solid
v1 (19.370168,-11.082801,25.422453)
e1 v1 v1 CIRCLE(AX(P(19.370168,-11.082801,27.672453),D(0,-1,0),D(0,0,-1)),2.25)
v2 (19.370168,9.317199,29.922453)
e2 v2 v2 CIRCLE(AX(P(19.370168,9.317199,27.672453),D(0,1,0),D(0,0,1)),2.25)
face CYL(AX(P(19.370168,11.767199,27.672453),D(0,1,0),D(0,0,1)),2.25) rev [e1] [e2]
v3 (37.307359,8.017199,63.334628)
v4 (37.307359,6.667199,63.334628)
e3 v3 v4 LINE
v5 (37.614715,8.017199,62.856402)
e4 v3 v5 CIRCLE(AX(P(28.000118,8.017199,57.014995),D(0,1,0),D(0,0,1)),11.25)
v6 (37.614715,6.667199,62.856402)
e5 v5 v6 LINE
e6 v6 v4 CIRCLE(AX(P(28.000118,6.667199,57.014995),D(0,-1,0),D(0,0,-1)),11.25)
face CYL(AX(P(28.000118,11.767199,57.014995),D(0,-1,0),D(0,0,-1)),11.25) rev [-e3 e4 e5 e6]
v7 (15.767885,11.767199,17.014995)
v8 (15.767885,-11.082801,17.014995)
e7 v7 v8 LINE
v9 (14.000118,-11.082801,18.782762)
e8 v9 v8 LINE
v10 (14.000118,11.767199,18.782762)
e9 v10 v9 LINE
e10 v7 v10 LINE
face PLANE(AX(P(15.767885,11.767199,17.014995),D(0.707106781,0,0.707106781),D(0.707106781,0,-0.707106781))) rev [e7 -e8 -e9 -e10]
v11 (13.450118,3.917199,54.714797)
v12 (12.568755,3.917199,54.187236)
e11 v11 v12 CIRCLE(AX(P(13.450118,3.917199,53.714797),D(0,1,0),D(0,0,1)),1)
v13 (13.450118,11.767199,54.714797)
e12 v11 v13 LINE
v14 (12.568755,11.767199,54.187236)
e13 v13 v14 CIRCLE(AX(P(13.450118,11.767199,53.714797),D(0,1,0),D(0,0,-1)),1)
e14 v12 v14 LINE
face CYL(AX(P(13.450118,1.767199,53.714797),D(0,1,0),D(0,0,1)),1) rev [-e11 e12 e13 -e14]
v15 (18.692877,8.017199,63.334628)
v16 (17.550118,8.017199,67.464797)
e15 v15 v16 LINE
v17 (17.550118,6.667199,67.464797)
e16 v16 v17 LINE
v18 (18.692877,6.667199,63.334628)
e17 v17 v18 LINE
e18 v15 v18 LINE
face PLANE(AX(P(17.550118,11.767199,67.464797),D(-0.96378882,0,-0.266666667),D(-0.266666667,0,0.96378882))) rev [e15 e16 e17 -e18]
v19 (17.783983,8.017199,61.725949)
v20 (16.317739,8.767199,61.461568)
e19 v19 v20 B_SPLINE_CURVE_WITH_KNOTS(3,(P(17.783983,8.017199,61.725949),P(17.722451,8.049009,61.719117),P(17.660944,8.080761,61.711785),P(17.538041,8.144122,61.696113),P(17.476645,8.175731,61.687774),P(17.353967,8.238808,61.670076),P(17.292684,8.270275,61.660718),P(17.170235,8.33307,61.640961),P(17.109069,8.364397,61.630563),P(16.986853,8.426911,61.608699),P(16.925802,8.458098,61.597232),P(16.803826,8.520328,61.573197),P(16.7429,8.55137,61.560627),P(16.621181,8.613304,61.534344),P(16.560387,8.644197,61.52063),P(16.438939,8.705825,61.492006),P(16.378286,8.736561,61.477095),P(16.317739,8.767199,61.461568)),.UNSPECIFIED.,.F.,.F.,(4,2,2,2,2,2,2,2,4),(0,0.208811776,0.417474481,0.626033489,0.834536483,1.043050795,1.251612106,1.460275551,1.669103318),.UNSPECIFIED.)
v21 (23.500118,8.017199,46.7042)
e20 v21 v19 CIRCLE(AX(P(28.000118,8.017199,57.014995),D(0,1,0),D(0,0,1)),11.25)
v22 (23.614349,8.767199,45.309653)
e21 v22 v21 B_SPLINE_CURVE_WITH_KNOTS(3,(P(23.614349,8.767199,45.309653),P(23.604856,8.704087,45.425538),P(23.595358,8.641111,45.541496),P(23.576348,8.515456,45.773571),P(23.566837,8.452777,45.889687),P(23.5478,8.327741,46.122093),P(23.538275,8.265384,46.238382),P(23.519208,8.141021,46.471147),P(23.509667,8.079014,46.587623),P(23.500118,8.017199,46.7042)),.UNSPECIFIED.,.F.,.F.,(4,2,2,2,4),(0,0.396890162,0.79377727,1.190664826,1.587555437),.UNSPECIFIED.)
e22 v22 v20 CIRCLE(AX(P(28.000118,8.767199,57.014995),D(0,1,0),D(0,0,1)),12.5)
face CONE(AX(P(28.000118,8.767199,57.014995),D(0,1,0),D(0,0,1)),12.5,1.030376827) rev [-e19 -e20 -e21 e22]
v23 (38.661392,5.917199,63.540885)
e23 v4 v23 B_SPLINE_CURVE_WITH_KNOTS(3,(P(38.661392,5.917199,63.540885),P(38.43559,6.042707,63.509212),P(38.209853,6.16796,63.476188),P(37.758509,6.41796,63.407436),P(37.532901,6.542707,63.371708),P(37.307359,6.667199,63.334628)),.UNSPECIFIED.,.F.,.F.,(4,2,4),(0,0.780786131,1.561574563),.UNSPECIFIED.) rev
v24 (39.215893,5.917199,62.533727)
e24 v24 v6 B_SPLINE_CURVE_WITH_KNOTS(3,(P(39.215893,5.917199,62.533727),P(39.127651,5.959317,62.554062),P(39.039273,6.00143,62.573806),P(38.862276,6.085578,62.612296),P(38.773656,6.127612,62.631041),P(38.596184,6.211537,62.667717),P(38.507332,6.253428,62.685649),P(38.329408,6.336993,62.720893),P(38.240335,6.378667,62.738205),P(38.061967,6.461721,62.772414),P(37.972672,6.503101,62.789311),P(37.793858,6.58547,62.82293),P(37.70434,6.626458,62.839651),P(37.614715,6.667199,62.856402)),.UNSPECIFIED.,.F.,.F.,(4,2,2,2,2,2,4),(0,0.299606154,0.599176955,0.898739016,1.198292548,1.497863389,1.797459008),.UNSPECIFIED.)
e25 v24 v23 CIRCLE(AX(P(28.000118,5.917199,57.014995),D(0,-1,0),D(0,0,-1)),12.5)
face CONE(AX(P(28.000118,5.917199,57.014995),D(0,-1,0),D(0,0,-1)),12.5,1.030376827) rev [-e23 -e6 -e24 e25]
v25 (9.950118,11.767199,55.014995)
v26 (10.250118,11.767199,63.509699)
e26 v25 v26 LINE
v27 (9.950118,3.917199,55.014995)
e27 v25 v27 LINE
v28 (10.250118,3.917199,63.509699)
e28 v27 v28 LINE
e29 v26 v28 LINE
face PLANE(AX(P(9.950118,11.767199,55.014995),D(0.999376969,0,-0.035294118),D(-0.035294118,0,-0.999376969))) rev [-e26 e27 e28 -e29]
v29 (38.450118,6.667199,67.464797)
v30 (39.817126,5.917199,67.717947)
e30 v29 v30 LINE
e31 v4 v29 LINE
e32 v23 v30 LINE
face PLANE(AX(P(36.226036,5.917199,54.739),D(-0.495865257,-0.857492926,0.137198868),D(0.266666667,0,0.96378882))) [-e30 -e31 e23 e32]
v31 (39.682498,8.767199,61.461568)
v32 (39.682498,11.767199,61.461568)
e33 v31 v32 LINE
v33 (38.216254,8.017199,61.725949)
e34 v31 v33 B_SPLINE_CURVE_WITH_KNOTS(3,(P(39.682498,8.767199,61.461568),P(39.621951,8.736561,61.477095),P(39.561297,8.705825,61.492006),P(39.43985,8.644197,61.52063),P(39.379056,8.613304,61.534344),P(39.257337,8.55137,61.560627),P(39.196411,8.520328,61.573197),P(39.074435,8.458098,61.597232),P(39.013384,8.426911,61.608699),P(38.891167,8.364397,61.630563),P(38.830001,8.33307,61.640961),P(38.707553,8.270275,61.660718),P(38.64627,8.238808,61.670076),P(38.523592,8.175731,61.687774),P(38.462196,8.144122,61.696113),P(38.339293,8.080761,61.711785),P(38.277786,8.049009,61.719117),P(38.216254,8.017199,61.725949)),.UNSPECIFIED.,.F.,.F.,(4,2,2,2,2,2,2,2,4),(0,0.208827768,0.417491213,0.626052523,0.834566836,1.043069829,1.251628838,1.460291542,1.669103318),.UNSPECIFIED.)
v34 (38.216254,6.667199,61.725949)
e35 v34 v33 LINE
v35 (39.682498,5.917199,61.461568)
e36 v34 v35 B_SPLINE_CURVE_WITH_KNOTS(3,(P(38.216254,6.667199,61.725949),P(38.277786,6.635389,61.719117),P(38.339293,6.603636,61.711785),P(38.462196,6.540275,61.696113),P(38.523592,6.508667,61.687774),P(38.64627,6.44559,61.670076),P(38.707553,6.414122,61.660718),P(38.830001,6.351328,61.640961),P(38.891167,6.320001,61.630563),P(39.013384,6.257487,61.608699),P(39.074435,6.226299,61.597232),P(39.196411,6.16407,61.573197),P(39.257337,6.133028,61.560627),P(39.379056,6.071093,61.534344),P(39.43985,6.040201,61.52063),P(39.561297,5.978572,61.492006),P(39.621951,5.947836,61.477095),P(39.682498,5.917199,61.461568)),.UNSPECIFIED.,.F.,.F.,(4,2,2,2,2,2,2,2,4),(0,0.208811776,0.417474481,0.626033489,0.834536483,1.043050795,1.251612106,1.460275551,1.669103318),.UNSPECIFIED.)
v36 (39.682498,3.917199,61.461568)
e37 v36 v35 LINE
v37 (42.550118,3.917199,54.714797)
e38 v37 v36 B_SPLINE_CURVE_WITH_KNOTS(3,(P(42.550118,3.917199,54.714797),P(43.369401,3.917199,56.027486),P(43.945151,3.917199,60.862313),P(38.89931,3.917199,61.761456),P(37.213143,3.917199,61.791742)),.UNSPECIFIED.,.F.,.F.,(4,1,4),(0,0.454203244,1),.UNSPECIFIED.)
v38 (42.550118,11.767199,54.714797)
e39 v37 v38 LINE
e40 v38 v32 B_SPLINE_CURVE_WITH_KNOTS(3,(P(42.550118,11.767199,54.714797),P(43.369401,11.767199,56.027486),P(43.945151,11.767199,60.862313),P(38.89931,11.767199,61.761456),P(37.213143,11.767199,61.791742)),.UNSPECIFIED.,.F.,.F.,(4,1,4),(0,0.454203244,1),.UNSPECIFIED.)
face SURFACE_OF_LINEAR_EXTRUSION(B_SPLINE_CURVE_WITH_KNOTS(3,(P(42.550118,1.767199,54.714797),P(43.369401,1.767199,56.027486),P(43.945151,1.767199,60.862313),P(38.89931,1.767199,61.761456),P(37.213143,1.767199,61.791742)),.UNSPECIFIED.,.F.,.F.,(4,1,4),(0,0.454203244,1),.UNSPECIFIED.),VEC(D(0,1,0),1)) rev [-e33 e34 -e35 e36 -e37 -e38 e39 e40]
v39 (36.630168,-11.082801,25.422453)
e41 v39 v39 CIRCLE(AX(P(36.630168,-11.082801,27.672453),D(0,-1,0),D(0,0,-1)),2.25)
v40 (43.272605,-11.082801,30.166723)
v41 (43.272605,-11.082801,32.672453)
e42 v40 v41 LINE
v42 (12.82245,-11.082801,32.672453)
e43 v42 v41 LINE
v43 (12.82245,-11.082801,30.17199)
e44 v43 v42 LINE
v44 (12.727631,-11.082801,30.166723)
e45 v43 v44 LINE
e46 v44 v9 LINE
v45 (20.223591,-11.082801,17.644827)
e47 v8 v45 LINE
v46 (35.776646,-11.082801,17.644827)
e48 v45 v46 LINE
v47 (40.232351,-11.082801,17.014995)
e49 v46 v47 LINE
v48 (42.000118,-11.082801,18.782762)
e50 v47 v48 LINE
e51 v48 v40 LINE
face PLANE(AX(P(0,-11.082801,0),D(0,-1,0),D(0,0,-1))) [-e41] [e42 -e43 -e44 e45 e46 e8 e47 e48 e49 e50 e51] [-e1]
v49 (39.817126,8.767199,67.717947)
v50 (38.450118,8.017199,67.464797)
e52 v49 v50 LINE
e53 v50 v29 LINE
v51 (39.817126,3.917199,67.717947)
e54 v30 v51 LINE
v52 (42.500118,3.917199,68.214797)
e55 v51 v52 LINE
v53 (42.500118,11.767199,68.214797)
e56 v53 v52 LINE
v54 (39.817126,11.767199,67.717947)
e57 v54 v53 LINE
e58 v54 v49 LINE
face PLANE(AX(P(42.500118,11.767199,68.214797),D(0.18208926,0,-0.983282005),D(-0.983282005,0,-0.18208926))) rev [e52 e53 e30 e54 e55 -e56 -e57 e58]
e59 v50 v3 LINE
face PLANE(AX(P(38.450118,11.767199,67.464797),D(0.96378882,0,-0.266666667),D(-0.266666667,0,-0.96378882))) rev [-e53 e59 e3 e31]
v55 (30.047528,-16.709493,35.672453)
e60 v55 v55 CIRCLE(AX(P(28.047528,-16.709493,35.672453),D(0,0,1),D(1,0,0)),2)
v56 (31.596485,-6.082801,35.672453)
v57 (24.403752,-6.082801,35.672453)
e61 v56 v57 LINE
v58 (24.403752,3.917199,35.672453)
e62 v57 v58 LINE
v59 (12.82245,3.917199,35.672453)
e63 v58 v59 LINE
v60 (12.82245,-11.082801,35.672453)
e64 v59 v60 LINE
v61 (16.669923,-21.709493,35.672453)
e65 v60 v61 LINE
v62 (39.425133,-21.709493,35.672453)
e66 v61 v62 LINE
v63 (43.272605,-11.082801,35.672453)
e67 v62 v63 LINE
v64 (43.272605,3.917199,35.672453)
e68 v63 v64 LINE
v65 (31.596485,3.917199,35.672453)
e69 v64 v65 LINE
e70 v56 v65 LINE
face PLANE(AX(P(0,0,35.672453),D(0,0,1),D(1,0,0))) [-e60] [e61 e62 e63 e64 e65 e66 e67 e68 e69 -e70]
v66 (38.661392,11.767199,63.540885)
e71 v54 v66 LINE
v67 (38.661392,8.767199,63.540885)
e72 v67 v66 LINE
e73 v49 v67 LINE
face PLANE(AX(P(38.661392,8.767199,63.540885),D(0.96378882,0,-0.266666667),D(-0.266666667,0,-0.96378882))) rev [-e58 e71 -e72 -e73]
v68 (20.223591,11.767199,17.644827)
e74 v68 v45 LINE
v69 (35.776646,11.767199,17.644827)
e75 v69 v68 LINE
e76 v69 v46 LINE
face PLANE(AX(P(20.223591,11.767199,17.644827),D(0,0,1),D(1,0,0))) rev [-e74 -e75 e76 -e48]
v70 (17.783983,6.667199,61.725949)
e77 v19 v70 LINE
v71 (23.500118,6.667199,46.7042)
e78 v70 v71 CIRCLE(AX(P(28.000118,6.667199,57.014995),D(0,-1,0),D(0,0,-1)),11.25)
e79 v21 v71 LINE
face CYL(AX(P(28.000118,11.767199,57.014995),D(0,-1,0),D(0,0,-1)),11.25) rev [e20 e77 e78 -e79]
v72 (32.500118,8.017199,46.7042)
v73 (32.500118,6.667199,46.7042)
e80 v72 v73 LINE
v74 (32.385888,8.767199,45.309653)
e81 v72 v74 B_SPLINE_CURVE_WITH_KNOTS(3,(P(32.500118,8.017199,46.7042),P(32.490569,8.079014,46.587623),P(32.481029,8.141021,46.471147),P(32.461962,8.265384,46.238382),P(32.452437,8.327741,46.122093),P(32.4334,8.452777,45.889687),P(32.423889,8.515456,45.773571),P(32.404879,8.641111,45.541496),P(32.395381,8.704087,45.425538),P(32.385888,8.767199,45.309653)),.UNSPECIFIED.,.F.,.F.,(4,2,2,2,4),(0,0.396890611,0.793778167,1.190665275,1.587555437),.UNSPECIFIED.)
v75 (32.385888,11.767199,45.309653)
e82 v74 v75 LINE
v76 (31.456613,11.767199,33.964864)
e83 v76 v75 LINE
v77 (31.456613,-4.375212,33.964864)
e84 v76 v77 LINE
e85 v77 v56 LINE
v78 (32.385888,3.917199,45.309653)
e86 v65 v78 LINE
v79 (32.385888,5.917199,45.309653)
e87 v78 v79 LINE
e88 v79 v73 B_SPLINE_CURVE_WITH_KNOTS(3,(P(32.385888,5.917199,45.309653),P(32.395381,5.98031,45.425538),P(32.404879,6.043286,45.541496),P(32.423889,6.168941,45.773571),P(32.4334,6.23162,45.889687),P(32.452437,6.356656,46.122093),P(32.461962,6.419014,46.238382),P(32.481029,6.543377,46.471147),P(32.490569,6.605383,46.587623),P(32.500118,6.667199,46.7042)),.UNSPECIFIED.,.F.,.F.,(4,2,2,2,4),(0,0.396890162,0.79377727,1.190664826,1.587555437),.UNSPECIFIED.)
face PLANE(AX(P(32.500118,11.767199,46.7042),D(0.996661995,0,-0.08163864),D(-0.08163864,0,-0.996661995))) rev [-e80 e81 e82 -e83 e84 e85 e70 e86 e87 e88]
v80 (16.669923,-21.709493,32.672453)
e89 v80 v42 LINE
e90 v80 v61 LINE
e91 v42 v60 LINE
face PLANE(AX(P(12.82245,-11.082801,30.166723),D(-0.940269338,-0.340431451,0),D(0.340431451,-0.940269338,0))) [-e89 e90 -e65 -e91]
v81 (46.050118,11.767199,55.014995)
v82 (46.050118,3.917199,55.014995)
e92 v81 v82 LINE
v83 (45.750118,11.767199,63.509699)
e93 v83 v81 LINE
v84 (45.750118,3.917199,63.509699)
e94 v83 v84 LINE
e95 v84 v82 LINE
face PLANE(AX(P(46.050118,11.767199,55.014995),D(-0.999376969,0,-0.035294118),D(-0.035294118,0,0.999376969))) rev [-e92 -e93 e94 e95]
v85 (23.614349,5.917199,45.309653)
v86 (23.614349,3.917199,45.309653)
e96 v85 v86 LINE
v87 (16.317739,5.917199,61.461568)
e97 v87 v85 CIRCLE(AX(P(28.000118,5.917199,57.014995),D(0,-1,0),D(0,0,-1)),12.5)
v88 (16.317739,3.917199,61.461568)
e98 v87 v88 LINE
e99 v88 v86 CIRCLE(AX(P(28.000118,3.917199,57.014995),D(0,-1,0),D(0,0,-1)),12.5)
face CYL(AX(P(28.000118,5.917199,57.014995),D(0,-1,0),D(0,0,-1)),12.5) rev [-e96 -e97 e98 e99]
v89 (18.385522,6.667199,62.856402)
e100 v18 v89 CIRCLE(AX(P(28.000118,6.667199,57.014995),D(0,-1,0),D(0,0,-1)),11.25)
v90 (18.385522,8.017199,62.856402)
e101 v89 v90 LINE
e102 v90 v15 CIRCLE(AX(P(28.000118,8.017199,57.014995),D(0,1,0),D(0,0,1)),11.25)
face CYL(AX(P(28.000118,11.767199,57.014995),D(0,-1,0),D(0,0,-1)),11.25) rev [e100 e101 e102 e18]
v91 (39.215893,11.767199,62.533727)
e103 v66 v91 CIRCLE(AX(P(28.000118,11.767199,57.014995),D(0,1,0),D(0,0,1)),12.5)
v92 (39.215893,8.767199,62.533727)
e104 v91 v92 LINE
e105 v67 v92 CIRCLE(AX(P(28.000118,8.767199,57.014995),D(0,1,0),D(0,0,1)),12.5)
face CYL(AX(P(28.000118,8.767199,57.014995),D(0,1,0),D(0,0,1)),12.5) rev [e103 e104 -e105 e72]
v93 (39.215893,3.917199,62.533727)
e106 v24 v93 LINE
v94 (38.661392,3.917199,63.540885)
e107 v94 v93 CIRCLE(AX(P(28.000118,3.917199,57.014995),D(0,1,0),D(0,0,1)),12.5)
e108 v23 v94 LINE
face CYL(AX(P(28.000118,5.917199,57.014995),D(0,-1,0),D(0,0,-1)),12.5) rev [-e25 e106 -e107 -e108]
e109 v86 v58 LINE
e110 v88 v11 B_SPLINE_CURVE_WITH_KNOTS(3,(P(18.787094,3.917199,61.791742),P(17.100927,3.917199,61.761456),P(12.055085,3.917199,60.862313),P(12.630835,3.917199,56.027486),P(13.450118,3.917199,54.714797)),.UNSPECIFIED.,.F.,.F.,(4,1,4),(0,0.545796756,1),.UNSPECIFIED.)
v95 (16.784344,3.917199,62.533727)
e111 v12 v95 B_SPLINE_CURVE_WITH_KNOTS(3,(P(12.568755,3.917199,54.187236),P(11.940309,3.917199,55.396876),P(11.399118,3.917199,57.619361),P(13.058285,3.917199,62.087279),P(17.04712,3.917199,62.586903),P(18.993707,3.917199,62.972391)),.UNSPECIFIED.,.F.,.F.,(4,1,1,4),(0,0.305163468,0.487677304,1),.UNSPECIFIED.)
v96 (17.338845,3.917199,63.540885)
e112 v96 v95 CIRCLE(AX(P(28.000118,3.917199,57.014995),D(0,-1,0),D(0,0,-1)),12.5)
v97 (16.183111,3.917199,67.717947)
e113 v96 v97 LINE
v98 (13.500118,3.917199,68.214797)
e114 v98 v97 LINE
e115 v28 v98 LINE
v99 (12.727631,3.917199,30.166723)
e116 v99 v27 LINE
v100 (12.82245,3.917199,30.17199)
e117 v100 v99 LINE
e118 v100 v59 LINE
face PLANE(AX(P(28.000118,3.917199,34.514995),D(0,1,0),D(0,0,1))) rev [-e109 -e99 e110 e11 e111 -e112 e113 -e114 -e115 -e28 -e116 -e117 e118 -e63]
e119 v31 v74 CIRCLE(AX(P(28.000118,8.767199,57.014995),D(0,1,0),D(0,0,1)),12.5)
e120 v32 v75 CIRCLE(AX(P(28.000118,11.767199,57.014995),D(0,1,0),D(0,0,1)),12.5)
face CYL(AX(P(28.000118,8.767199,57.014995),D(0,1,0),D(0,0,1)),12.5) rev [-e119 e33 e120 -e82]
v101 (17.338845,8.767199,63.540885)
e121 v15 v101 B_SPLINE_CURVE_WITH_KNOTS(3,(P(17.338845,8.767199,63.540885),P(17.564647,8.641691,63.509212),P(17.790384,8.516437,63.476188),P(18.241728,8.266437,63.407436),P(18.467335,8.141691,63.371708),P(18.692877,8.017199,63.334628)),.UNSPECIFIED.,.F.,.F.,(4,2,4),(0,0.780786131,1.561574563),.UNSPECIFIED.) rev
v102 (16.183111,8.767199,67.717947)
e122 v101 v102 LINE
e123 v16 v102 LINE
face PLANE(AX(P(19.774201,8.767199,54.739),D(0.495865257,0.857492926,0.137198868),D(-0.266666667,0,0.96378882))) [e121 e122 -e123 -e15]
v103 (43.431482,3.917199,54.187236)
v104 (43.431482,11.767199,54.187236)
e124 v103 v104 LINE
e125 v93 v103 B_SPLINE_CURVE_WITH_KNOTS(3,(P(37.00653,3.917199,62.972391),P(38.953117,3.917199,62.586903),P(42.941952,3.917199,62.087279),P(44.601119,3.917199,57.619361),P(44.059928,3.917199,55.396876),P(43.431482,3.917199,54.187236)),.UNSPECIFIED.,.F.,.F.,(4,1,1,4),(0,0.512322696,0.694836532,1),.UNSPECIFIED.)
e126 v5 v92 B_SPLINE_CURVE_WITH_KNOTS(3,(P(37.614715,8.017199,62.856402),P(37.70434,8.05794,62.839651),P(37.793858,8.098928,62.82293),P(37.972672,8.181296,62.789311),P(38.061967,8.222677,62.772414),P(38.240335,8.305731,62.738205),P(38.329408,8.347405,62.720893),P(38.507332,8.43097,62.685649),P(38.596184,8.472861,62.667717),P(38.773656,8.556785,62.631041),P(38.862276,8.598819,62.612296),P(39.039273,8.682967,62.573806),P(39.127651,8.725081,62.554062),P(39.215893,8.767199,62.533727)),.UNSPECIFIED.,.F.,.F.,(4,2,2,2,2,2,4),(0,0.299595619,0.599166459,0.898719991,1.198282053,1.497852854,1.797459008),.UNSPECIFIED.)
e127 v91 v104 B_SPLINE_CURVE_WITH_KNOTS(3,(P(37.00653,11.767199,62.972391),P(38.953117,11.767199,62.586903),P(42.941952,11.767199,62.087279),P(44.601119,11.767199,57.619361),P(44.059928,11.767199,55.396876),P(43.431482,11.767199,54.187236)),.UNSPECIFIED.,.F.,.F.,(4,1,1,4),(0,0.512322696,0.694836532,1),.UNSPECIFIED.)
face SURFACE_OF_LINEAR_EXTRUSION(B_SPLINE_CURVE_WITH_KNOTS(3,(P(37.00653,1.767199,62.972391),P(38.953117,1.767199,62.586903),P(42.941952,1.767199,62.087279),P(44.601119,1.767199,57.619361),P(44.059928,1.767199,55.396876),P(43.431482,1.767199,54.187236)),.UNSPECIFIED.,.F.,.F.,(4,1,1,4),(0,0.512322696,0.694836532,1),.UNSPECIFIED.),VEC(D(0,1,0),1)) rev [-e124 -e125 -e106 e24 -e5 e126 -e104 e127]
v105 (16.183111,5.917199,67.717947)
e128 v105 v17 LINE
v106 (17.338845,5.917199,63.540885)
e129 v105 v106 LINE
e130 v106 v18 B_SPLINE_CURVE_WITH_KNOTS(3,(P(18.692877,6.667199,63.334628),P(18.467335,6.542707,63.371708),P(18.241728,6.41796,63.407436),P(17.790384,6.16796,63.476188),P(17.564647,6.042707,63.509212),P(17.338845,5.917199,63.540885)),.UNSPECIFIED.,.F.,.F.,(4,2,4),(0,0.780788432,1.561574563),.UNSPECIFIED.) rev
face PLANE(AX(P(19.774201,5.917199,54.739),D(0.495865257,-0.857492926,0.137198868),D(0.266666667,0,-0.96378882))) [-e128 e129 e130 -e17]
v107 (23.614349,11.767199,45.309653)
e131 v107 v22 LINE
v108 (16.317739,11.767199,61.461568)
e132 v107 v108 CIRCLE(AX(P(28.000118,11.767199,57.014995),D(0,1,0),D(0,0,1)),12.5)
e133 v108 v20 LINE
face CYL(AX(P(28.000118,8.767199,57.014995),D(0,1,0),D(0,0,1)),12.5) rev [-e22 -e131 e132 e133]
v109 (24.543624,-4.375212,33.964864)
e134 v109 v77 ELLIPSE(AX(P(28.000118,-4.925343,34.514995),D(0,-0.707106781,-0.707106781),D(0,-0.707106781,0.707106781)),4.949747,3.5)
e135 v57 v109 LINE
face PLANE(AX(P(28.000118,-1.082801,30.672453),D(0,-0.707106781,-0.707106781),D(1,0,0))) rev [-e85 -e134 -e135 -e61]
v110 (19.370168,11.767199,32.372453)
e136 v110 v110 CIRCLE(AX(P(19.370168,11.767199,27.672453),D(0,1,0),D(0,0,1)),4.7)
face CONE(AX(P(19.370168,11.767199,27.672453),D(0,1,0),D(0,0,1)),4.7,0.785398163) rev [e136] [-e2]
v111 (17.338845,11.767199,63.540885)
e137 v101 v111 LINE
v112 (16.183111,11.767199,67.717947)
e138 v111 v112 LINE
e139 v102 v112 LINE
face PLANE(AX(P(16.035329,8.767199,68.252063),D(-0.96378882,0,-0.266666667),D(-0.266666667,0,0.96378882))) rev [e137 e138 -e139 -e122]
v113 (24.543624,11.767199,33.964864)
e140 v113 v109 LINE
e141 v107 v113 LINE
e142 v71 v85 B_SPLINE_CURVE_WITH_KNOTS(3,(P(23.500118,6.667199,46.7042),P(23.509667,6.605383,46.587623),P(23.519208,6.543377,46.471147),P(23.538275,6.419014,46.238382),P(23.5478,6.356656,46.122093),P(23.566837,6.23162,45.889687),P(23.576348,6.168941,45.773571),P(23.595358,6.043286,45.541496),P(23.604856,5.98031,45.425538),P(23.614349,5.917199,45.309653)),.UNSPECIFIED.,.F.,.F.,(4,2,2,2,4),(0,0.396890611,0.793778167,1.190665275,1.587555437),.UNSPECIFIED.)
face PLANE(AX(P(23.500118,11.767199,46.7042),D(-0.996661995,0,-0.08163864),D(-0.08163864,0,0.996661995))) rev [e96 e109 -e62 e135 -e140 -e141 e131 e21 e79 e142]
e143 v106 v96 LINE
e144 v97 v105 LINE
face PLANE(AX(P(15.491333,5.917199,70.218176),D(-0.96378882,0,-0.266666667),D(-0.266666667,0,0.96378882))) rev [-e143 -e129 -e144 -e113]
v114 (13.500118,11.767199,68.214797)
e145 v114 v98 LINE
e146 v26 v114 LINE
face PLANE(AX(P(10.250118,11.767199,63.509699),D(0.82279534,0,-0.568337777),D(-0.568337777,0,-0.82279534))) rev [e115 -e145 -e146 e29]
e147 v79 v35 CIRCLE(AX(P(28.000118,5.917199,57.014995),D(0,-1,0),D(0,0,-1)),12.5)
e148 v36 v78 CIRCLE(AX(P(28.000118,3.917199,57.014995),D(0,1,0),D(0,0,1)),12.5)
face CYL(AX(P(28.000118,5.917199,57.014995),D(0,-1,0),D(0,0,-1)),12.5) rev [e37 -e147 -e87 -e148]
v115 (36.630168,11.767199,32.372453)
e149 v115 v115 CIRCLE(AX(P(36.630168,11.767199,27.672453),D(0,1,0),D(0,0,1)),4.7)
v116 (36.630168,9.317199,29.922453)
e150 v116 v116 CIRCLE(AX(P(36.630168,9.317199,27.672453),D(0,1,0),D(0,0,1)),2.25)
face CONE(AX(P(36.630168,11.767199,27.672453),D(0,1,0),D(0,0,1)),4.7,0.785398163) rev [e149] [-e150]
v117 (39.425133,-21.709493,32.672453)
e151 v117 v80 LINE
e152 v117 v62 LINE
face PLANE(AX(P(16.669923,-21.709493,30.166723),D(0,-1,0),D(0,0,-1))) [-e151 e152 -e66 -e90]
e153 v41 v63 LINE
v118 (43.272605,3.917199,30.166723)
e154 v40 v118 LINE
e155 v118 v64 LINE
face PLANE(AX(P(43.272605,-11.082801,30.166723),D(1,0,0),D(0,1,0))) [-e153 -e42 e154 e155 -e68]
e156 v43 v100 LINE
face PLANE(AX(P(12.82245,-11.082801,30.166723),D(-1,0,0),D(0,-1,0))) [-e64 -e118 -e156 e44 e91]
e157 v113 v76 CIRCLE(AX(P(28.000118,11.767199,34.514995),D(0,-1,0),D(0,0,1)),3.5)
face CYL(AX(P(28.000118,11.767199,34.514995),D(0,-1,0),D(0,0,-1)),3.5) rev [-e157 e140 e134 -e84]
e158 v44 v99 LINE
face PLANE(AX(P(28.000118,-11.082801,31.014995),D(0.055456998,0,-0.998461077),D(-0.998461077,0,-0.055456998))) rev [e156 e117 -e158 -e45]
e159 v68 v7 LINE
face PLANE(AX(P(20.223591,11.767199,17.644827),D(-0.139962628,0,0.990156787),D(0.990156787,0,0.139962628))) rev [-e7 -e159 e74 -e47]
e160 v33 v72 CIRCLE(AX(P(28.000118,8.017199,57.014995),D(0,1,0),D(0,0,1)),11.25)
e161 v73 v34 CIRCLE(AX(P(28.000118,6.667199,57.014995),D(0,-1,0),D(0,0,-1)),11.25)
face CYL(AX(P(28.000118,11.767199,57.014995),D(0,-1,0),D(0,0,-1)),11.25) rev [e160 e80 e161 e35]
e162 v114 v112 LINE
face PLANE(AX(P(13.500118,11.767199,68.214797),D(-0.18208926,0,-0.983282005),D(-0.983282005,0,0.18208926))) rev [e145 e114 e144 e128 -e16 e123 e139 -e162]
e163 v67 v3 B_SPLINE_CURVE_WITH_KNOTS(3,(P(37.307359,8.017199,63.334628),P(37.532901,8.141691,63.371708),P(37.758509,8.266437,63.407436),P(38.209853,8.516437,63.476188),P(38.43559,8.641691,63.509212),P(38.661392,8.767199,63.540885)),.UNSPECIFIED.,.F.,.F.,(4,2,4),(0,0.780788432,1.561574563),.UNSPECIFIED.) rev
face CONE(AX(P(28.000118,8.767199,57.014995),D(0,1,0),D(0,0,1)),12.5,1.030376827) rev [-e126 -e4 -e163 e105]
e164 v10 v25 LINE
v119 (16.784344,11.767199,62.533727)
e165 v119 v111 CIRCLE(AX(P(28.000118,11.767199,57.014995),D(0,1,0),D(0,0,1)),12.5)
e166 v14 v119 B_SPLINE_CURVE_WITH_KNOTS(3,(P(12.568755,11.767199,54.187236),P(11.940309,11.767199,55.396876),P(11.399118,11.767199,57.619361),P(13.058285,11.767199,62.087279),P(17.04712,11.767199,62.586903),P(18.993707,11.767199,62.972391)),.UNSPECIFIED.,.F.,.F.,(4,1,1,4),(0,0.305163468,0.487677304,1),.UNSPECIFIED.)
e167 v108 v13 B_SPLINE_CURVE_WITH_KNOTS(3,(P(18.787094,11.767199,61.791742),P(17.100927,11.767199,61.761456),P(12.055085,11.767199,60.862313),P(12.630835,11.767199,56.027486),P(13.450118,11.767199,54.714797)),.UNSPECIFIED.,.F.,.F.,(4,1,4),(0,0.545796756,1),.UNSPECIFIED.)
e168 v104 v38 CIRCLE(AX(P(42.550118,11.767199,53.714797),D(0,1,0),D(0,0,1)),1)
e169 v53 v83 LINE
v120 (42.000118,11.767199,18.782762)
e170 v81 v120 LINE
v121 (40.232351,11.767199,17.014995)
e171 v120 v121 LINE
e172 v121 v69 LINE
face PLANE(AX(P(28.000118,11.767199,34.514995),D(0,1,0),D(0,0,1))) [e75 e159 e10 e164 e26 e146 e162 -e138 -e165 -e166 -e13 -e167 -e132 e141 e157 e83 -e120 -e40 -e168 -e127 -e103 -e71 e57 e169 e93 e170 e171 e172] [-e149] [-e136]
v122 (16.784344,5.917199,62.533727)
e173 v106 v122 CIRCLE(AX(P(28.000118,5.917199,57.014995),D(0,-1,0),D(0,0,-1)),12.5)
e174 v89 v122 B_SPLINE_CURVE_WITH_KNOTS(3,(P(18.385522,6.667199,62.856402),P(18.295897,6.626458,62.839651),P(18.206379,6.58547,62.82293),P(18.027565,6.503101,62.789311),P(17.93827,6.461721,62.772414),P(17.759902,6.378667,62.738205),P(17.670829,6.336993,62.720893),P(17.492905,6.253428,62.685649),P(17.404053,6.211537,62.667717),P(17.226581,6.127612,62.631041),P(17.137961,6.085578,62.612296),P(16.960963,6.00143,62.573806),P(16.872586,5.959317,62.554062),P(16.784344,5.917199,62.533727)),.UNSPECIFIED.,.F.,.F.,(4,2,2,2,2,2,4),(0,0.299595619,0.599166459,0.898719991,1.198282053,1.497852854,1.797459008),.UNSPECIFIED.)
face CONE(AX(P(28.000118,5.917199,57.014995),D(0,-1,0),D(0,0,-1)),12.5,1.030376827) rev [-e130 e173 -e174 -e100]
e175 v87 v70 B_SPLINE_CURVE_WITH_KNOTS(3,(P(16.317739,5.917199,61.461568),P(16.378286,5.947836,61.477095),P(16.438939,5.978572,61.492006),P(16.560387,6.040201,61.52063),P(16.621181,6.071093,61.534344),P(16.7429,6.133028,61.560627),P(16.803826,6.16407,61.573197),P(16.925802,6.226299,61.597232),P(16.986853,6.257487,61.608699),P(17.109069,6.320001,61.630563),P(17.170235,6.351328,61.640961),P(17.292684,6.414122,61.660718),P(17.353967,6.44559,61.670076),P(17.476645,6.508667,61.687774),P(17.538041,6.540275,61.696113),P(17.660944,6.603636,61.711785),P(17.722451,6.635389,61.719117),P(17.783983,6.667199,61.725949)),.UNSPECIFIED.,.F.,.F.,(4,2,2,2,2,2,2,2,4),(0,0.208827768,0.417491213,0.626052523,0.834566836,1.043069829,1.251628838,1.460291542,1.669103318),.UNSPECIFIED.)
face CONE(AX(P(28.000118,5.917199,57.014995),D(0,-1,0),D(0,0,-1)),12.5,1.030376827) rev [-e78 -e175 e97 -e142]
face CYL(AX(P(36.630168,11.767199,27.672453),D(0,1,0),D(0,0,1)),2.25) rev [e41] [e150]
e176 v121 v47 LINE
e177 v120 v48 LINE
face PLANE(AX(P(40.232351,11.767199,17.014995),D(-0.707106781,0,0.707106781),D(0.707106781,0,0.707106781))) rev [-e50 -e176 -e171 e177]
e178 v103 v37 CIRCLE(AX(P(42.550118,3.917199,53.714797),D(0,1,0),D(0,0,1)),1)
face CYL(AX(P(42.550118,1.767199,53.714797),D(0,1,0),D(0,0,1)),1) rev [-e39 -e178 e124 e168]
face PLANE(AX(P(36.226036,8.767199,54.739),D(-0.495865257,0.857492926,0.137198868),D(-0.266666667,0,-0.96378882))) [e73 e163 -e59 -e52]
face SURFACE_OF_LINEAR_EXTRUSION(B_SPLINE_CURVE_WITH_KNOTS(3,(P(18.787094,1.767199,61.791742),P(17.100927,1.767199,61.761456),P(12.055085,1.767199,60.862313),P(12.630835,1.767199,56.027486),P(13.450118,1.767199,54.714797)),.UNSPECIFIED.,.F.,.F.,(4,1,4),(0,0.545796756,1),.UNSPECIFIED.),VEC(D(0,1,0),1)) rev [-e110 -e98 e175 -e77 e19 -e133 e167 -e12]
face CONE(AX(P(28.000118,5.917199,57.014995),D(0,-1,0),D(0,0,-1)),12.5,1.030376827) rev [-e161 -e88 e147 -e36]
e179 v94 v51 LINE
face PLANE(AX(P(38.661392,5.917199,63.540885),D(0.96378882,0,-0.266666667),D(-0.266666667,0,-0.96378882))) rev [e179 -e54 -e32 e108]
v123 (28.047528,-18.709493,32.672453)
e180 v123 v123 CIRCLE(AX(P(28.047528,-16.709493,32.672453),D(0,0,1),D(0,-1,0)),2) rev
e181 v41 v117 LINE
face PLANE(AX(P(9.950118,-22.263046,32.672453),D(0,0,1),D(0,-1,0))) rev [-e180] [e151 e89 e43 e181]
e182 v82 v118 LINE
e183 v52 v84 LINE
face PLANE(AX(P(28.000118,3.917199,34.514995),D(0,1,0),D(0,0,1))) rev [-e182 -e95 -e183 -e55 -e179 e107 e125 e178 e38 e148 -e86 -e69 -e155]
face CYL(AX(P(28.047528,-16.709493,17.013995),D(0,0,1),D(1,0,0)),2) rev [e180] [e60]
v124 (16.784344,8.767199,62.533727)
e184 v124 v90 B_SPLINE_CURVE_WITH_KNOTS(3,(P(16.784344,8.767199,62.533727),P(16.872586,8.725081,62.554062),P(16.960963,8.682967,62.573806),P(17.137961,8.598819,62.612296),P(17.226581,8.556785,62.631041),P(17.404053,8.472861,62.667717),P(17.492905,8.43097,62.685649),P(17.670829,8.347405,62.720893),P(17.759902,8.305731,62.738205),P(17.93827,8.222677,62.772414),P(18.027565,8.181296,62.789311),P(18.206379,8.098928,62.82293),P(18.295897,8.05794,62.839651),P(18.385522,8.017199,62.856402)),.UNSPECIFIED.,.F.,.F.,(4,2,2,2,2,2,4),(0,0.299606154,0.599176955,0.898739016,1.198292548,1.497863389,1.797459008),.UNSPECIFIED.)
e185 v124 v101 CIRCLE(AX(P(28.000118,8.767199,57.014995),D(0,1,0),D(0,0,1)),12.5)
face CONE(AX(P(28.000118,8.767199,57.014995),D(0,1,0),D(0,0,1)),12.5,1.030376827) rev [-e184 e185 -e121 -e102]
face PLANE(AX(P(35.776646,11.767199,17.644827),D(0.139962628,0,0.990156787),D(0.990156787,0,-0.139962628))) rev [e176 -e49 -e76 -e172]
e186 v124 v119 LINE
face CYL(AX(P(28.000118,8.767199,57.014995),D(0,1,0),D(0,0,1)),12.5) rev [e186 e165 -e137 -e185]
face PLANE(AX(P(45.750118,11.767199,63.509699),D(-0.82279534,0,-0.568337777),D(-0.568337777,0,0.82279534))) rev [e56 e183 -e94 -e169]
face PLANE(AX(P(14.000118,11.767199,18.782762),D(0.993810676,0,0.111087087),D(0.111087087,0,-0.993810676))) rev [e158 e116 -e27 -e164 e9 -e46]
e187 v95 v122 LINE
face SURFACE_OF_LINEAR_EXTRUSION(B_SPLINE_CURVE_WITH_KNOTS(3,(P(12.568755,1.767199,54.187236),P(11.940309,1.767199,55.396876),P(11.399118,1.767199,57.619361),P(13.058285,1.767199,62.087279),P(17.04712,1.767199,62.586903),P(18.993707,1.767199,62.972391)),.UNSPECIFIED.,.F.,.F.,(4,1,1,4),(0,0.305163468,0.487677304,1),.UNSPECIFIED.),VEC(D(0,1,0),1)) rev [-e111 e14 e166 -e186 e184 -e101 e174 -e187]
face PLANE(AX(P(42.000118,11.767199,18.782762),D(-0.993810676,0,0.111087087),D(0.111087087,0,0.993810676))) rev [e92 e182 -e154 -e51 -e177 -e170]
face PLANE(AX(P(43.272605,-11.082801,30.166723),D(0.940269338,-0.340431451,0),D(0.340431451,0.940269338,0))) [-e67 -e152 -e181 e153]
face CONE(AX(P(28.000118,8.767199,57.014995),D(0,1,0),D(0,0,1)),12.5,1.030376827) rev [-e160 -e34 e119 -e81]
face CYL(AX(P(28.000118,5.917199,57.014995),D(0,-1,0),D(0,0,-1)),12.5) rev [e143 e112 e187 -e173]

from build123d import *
from OCP.BRepFilletAPI import BRepFilletAPI_MakeChamfer

# Parameters (mm, degrees)
EXTRUDE_1_DEPTH                                 = 15.7
CUT_EXTRUDE_5_DEPTH                             = 6
CUT_EXTRUDE_START                               = -4
CUT_EXTRUDE_6_DEPTH                             = 4
CHAMFER_2_SIZE                                  = 2.5
CHAMFER_2_SIZE_2                                = 1.5
CHAMFER_3_SIZE                                  = 2.5
CHAMFER_3_SIZE_2                                = 1.5
CHAMFER_4_SIZE                                  = 2.5
CHAMFER_4_SIZE_2                                = 1.5
CHAMFER_5_SIZE                                  = 1.5
CHAMFER_5_SIZE_2                                = 2.5
CUT_EXTRUDE_7_DEPTH                             = 20
SCALE1_SCALE                                    = 0.5
BOSS_EXTRUDE2_DEPTH                             = 15
CSK_FOR_M4_FLAT_HEAD_MACHINE_SCREW1_D           = 4.5
CSK_FOR_M4_FLAT_HEAD_MACHINE_SCREW1_DEPTH       = 28.648063607
CSK_FOR_M4_FLAT_HEAD_MACHINE_SCREW1_CSINK_D     = 9.4
CSK_FOR_M4_FLAT_HEAD_MACHINE_SCREW1_CSINK_ANGLE = 90
CSK_FOR_M4_FLAT_HEAD_MACHINE_SCREW1_TIP         = 1.351936393
BOSS_EXTRUDE3_DEPTH                             = 3
BOSS_EXTRUDE3_DEPTH_BACK                        = 2.50573
CUT_EXTRUDE1_DEPTH                              = 79.961726409
CUT_EXTRUDE2_DEPTH                              = 5
CHAMFER1_START                                  = -1.425343225
CHAMFER1_DEPTH                                  = 0.342542044
CHAMFER1_START_2                                = -6.082801281
CHAMFER1_2_DEPTH                                = 4.657458056
CHAMFER1_START_3                                = 17
CHAMFER1_3_DEPTH                                = 3.923043383
CUT_EXTRUDE3_REACH                              = 62.423
SKETCH9_R                                       = 2


with BuildPart() as part:
    # Эскиз1 → Бобышка-Вытянуть1 (new body)
    with BuildSketch(Plane(origin=(0, 0, 0), x_dir=(1, 0, 0), z_dir=(0, 1, 0))):
        with BuildLine():
            Line((19, -55.842875467), (21.087010541, -30.364203971))
            ThreePointArc((21.087010541, -30.364203971), (28, -24.464466094), (34.912989459, -30.364203971))
            Line((34.912989459, -30.364203971), (37, -55.842875467))
            ThreePointArc((37, -55.842875467), (49.615065571, -70.216351148), (46.614482007, -89.103732671))
            Line((46.614482007, -89.103732671), (48.9, -97.364070254))
            Line((48.9, -97.364070254), (57, -98.864070254))
            Line((57, -98.864070254), (63.5, -89.453874559))
            Line((63.5, -89.453874559), (64.1, -72.464466094))
            Line((64.1, -72.464466094), (56, 0))
            Line((56, 0), (52.464466094, 3.535533906))
            Line((52.464466094, 3.535533906), (43.553055011, 2.275870258))
            Line((43.553055011, 2.275870258), (12.446944989, 2.275870258))
            Line((12.446944989, 2.275870258), (3.535533906, 3.535533906))
            Line((3.535533906, 3.535533906), (0, 0))
            Line((0, 0), (-8.1, -72.464466094))
            Line((-8.1, -72.464466094), (-7.5, -89.453874559))
            Line((-7.5, -89.453874559), (-1, -98.864070254))
            Line((-1, -98.864070254), (7.1, -97.364070254))
            Line((7.1, -97.364070254), (9.385517993, -89.103732671))
            ThreePointArc((9.385517993, -89.103732671), (6.384934429, -70.216351148), (19, -55.842875467))
        make_face()
    extrude(amount=EXTRUDE_1_DEPTH)

    # Эскиз9 → Вырез-Вытянуть5 (cut)
    with BuildSketch(Plane(origin=(0, 15.7, 0), x_dir=(1, 0, 0), z_dir=(0, 1, 0))):
        with BuildLine():
            Line((4.070420212, -98.938601985), (6.67745221, -89.516245887))
            ThreePointArc((6.67745221, -89.516245887), (28, -51.464466094), (49.32254779, -89.516245887))
            Line((49.32254779, -89.516245887), (51.928879153, -98.936069744))
            Line((51.928879153, -98.936069744), (4.070420212, -98.938601985))
        make_face()
    extrude(amount=-CUT_EXTRUDE_5_DEPTH, mode=Mode.SUBTRACT)

    # Эскиз10 → Вырез-Вытянуть6 (cut)
    with BuildSketch(Plane.XZ.offset(CUT_EXTRUDE_START)):
        with BuildLine():
            Line((49.32254779, 89.516245887), (52.714892846, 101.77688678))
            Line((52.714892846, 101.77688678), (2.982429051, 102.870828422))
            Line((2.982429051, 102.870828422), (6.67745221, 89.516245887))
            ThreePointArc((6.67745221, 89.516245887), (28, 51.464466094), (49.32254779, 89.516245887))
        make_face()
    extrude(amount=CUT_EXTRUDE_6_DEPTH, mode=Mode.SUBTRACT)

    # Фаска2
    chamfer_2_edges_1 = [part.edges().sort_by_distance(p)[0] for p in [
        (8.242758997, 9.7, 93.233901463),
    ]]
    chamfer_2_side_1 = [part.faces().sort_by_distance(p)[0] for p in [
        (8.213845332, 9.7, 93.225901463),
    ]]
    chamfer_2_edges_2 = [part.edges().sort_by_distance(p)[0] for p in [
        (6.384934429, 9.7, 70.216351148),
    ]]
    chamfer_2_side_2 = [part.faces().sort_by_distance(p)[0] for p in [
        (6.356114342, 9.7, 70.208020328),
    ]]
    chamfer_2 = BRepFilletAPI_MakeChamfer(part.part.solid().wrapped)
    for e in chamfer_2_edges_1:
        chamfer_2.Add(CHAMFER_2_SIZE - 0.0001, CHAMFER_2_SIZE_2 - 0.0001, e.wrapped, chamfer_2_side_1[0].wrapped)
    for e in chamfer_2_edges_2:
        chamfer_2.Add(CHAMFER_2_SIZE - 0.0001, CHAMFER_2_SIZE_2 - 0.0001, e.wrapped, chamfer_2_side_2[0].wrapped)
    add(Compound.cast(chamfer_2.Shape()), mode=Mode.REPLACE)  # a hair under: the kernel refuses the full size

    # Фаска3
    chamfer_3_edges_1 = [part.edges().sort_by_distance(p)[0] for p in [
        (8.242758997, 4, 93.233901463),
    ]]
    chamfer_3_side_1 = [part.faces().sort_by_distance(p)[0] for p in [
        (8.213845332, 4, 93.225901463),
    ]]
    chamfer_3_edges_2 = [part.edges().sort_by_distance(p)[0] for p in [
        (6.384934429, 4, 70.216351148),
    ]]
    chamfer_3_side_2 = [part.faces().sort_by_distance(p)[0] for p in [
        (6.384934429, 4.03, 70.216351148),
    ]]
    chamfer_3 = BRepFilletAPI_MakeChamfer(part.part.solid().wrapped)
    for e in chamfer_3_edges_1:
        chamfer_3.Add(CHAMFER_3_SIZE - 0.0001, CHAMFER_3_SIZE_2 - 0.0001, e.wrapped, chamfer_3_side_1[0].wrapped)
    for e in chamfer_3_edges_2:
        chamfer_3.Add(CHAMFER_3_SIZE_2 - 0.0001, CHAMFER_3_SIZE - 0.0001, e.wrapped, chamfer_3_side_2[0].wrapped)
    add(Compound.cast(chamfer_3.Shape()), mode=Mode.REPLACE)  # a hair under: the kernel refuses the full size

    # Фаска4
    chamfer_4_edges_1 = [part.edges().sort_by_distance(p)[0] for p in [
        (47.757241003, 9.7, 93.233901463),
    ]]
    chamfer_4_side_1 = [part.faces().sort_by_distance(p)[0] for p in [
        (47.786154668, 9.7, 93.225901463),
    ]]
    chamfer_4_edges_2 = [part.edges().sort_by_distance(p)[0] for p in [
        (49.615065571, 9.7, 70.216351148),
    ]]
    chamfer_4_side_2 = [part.faces().sort_by_distance(p)[0] for p in [
        (49.643885658, 9.7, 70.208020328),
    ]]
    chamfer_4 = BRepFilletAPI_MakeChamfer(part.part.solid().wrapped)
    for e in chamfer_4_edges_1:
        chamfer_4.Add(CHAMFER_4_SIZE - 0.0001, CHAMFER_4_SIZE_2 - 0.0001, e.wrapped, chamfer_4_side_1[0].wrapped)
    for e in chamfer_4_edges_2:
        chamfer_4.Add(CHAMFER_4_SIZE - 0.0001, CHAMFER_4_SIZE_2 - 0.0001, e.wrapped, chamfer_4_side_2[0].wrapped)
    add(Compound.cast(chamfer_4.Shape()), mode=Mode.REPLACE)  # a hair under: the kernel refuses the full size

    # Фаска5
    chamfer_5_edges_1 = [part.edges().sort_by_distance(p)[0] for p in [
        (47.757241003, 4, 93.233901463),
    ]]
    chamfer_5_side_1 = [part.faces().sort_by_distance(p)[0] for p in [
        (47.757241003, 4.03, 93.233901463),
    ]]
    chamfer_5_edges_2 = [part.edges().sort_by_distance(p)[0] for p in [
        (49.615065571, 4, 70.216351148),
    ]]
    chamfer_5_side_2 = [part.faces().sort_by_distance(p)[0] for p in [
        (49.643885658, 4, 70.208020328),
    ]]
    chamfer_5 = BRepFilletAPI_MakeChamfer(part.part.solid().wrapped)
    for e in chamfer_5_edges_1:
        chamfer_5.Add(CHAMFER_5_SIZE - 0.0001, CHAMFER_5_SIZE_2 - 0.0001, e.wrapped, chamfer_5_side_1[0].wrapped)
    for e in chamfer_5_edges_2:
        chamfer_5.Add(CHAMFER_5_SIZE_2 - 0.0001, CHAMFER_5_SIZE - 0.0001, e.wrapped, chamfer_5_side_2[0].wrapped)
    add(Compound.cast(chamfer_5.Shape()), mode=Mode.REPLACE)  # a hair under: the kernel refuses the full size

    # Эскиз11 → Вырез-Вытянуть7 (cut)
    with BuildSketch(Plane(origin=(0, 15.7, 0), x_dir=(1, 0, 0), z_dir=(0, 1, 0))):
        with BuildLine():
            Line((46.426049473, -86.017959352), (46.012822205, -88.379258027))
            add(Edge.make_bspline(
                [(58.862726543, -70.808948625), (60.119619749, -73.228227212), (61.202001727, -77.673197621), (57.883666669, -86.609034293), (49.905997231, -87.608281842), (46.012822205, -88.379258027)],
                knots=[0, 0, 0, 0, 0.305163468, 0.487677304, 1, 1, 1, 1], degree=3))
            ThreePointArc((58.862726543, -70.808948625), (56.072808864, -68.148005462), (57.1, -71.864070254))
            add(Edge.make_bspline(
                [(57.1, -71.864070254), (58.73856603, -74.489449168), (59.890065943, -84.15910166), (49.798382886, -85.957388163), (46.426049473, -86.017959352)],
                knots=[0, 0, 0, 0, 0.454203244, 1, 1, 1, 1], degree=3))
        make_face()
        with BuildLine():
            Line((9.573950527, -86.017959352), (9.987177795, -88.379258027))
            add(Edge.make_bspline(
                [(-2.862726543, -70.808948625), (-4.119619749, -73.228227212), (-5.202001727, -77.673197621), (-1.883666669, -86.609034293), (6.094002769, -87.608281842), (9.987177795, -88.379258027)],
                knots=[0, 0, 0, 0, 0.305163468, 0.487677304, 1, 1, 1, 1], degree=3))
            ThreePointArc((-2.862726543, -70.808948625), (-0.072808864, -68.148005462), (-1.1, -71.864070254))
            add(Edge.make_bspline(
                [(-1.1, -71.864070254), (-2.73856603, -74.489449168), (-3.890065943, -84.15910166), (6.201617114, -85.957388163), (9.573950527, -86.017959352)],
                knots=[0, 0, 0, 0, 0.454203244, 1, 1, 1, 1], degree=3))
        make_face()
    extrude(amount=-CUT_EXTRUDE_7_DEPTH, mode=Mode.SUBTRACT)


with BuildPart() as part_1:
    # Scale1: scaled about (27.999999844, 7.834407948, 37.565488007)
    add(part.part.scale(SCALE1_SCALE).moved(Location((13.999999922, 3.917203974, 18.782744003))))


with BuildPart() as boss_extrude2_tool:
    # Sketch5 → Boss-Extrude2 (new body)
    with BuildSketch(Plane.XZ.offset(-3.917198819)):
        Polygon((15.767885362, 17.014994944), (14.000118409, 18.782761897), (12.822450363, 29.318451551), (12.727631466, 30.166723248), (28.000118409, 31.014994944), (43.272605352, 30.166723248), (42.000118409, 18.782761897), (40.232351456, 17.014994944), (35.776645915, 17.644826768), (20.223590904, 17.644826768), align=None)
    extrude(amount=BOSS_EXTRUDE2_DEPTH)


with BuildPart() as part_2:
    add(part_1.part)


with BuildPart() as part_3:
    # Boss-Extrude2: joined with boss_extrude2_tool
    add(part_2.part.fuse(boss_extrude2_tool.part, tol=0.00001))

    # CSK for M4 Flat Head Machine Screw1
    with Locations(Plane(origin=(19.370167772, 11.767198819, 27.6724529), x_dir=(0, 0, 1), z_dir=(0, 1, 0))):
        with Locations((0, 0), (0, 17.26)):
            CounterSinkHole(CSK_FOR_M4_FLAT_HEAD_MACHINE_SCREW1_D / 2, CSK_FOR_M4_FLAT_HEAD_MACHINE_SCREW1_CSINK_D / 2, depth=CSK_FOR_M4_FLAT_HEAD_MACHINE_SCREW1_DEPTH, counter_sink_angle=CSK_FOR_M4_FLAT_HEAD_MACHINE_SCREW1_CSINK_ANGLE)
            with Locations((0, 0, -(CSK_FOR_M4_FLAT_HEAD_MACHINE_SCREW1_DEPTH + CSK_FOR_M4_FLAT_HEAD_MACHINE_SCREW1_TIP / 2))):  # 118° drill point
                Cone(0, CSK_FOR_M4_FLAT_HEAD_MACHINE_SCREW1_D / 2, CSK_FOR_M4_FLAT_HEAD_MACHINE_SCREW1_TIP, mode=Mode.SUBTRACT)


with BuildPart() as boss_extrude3_tool:
    # Sketch6 → Boss-Extrude3 (new, two sides: drawn at the far end of the back side and taken through both)
    with BuildSketch(Plane.XY.offset(32.6724529).offset(-BOSS_EXTRUDE3_DEPTH_BACK)):
        Polygon((12.822450363, -11.082801181), (12.822450363, 3.917198819), (43.272605352, 3.917198819), (43.272605352, -11.082801181), (39.425133125, -21.709493147), (16.66992259, -21.709493147), align=None)
    extrude(amount=BOSS_EXTRUDE3_DEPTH + BOSS_EXTRUDE3_DEPTH_BACK)


with BuildPart() as part_4:
    add(part_3.part)


with BuildPart() as part_5:
    # Boss-Extrude3: joined with boss_extrude3_tool
    add(part_4.part.fuse(boss_extrude3_tool.part, tol=0.00001))

    # Sketch7 → Cut-Extrude1 (cut, through all)
    with BuildSketch(Plane(origin=(43.272605352, 0, 0), x_dir=(0, 0, -1), z_dir=(1, 0, 0))):
        Polygon((-32.6724529, -22.263045792), (-32.6724529, -12.082801181), (-32.6724529, -11.082801181), (-31.6724529, -11.082801181), (-27.1724529, -11.082801181), (-27.1724529, -22.263045792), align=None)
    extrude(amount=-CUT_EXTRUDE1_DEPTH, mode=Mode.SUBTRACT)

    # Sketch8 → Cut-Extrude2 (cut)
    with BuildSketch(Plane(origin=(0, 3.917198819, 0), x_dir=(1, 0, 0), z_dir=(0, 1, 0))):
        with BuildLine():
            Line((31.596485278, -35.6724529), (31.456613139, -33.964863882))
            ThreePointArc((31.456613139, -33.964863882), (28.000118409, -31.014994944), (24.54362368, -33.964863882))
            Line((24.54362368, -33.964863882), (24.403751541, -35.6724529))
            Line((24.403751541, -35.6724529), (31.596485278, -35.6724529))
        make_face()
    extrude(amount=-CUT_EXTRUDE2_DEPTH, mode=Mode.SUBTRACT)

    # Chamfer1: read off the stored shape, not the designer's step
    # Chamfer1 outline → Chamfer1 (cut)
    with BuildSketch(Plane(origin=(0, 0, 0), x_dir=(1, 0, 0), z_dir=(0, 1, 0)).offset(CHAMFER1_START)):
        with BuildLine():
            ThreePointArc((31.456613139, -33.964863882), (28.00011841, -31.014994944), (24.54362368, -33.964863882))
            Line((24.54362368, -33.964863882), (24.403751541, -35.6724529))
            Line((24.403751541, -35.6724529), (31.596485278, -35.6724529))
            Line((31.596485278, -35.6724529), (31.456613139, -33.964863882))
        make_face()
    extrude(amount=CHAMFER1_DEPTH, mode=Mode.SUBTRACT)

    # Chamfer1 2 outline → Chamfer1 2 (cut)
    with BuildSketch(Plane(origin=(0, 0, 0), x_dir=(1, 0, 0), z_dir=(0, 1, 0)).offset(CHAMFER1_START_2)):
        with BuildLine():
            ThreePointArc((31.456613139, -33.964863882), (28.00011841, -31.014994944), (24.54362368, -33.964863882))
            Line((24.54362368, -33.964863882), (24.403751541, -35.6724529))
            Line((24.403751541, -35.6724529), (31.596485278, -35.6724529))
            Line((31.596485278, -35.6724529), (31.456613139, -33.964863882))
        make_face()
    extrude(amount=CHAMFER1_2_DEPTH, mode=Mode.SUBTRACT)

    # Chamfer1 3 outline → Chamfer1 3 (add)
    with BuildSketch(Plane(origin=(0, 0, 0), x_dir=(1, 0, 0), z_dir=(0, 0.7071067811865511, 0.7071067811865441)).offset(CHAMFER1_START_3)):
        with BuildLine():
            add(Edge.make_bspline(
                [(24.54362368, -27.110527763), (25.013120861, -22.938783104), (28.000118409, -22.938783104), (30.987115958, -22.938783104), (31.456613139, -27.110527763)],
                knots=[1.72863114, 1.72863114, 1.72863114, 3.141592654, 3.141592654, 4.554554167, 4.554554167, 4.554554167], degree=2, weights=[1, 0.760651137, 1, 0.760651137, 1]))
            Line((24.54362368, -27.110527763), (24.403751541, -29.525423311))
            Line((24.403751541, -29.525423311), (31.596485278, -29.525423311))
            Line((31.596485278, -29.525423311), (31.456613139, -27.110527763))
        make_face()
    extrude(amount=CHAMFER1_3_DEPTH)

    # Sketch9 → Cut-Extrude3 (cut, up to next)
    with BuildSketch(Plane.XY.offset(35.6724529), mode=Mode.PRIVATE) as cut_extrude3_sk1:
        with Locations((28.047527858, -16.709493147)):
            Circle(SKETCH9_R)
    cut_extrude3_tool1 = extrude(cut_extrude3_sk1.sketch, amount=-CUT_EXTRUDE3_REACH, mode=Mode.PRIVATE) & part_5.part
    add(cut_extrude3_tool1.solids().sort_by_distance((28.047528, -16.709493, 35.672453))[0], mode=Mode.SUBTRACT)


solid = part_5.part
